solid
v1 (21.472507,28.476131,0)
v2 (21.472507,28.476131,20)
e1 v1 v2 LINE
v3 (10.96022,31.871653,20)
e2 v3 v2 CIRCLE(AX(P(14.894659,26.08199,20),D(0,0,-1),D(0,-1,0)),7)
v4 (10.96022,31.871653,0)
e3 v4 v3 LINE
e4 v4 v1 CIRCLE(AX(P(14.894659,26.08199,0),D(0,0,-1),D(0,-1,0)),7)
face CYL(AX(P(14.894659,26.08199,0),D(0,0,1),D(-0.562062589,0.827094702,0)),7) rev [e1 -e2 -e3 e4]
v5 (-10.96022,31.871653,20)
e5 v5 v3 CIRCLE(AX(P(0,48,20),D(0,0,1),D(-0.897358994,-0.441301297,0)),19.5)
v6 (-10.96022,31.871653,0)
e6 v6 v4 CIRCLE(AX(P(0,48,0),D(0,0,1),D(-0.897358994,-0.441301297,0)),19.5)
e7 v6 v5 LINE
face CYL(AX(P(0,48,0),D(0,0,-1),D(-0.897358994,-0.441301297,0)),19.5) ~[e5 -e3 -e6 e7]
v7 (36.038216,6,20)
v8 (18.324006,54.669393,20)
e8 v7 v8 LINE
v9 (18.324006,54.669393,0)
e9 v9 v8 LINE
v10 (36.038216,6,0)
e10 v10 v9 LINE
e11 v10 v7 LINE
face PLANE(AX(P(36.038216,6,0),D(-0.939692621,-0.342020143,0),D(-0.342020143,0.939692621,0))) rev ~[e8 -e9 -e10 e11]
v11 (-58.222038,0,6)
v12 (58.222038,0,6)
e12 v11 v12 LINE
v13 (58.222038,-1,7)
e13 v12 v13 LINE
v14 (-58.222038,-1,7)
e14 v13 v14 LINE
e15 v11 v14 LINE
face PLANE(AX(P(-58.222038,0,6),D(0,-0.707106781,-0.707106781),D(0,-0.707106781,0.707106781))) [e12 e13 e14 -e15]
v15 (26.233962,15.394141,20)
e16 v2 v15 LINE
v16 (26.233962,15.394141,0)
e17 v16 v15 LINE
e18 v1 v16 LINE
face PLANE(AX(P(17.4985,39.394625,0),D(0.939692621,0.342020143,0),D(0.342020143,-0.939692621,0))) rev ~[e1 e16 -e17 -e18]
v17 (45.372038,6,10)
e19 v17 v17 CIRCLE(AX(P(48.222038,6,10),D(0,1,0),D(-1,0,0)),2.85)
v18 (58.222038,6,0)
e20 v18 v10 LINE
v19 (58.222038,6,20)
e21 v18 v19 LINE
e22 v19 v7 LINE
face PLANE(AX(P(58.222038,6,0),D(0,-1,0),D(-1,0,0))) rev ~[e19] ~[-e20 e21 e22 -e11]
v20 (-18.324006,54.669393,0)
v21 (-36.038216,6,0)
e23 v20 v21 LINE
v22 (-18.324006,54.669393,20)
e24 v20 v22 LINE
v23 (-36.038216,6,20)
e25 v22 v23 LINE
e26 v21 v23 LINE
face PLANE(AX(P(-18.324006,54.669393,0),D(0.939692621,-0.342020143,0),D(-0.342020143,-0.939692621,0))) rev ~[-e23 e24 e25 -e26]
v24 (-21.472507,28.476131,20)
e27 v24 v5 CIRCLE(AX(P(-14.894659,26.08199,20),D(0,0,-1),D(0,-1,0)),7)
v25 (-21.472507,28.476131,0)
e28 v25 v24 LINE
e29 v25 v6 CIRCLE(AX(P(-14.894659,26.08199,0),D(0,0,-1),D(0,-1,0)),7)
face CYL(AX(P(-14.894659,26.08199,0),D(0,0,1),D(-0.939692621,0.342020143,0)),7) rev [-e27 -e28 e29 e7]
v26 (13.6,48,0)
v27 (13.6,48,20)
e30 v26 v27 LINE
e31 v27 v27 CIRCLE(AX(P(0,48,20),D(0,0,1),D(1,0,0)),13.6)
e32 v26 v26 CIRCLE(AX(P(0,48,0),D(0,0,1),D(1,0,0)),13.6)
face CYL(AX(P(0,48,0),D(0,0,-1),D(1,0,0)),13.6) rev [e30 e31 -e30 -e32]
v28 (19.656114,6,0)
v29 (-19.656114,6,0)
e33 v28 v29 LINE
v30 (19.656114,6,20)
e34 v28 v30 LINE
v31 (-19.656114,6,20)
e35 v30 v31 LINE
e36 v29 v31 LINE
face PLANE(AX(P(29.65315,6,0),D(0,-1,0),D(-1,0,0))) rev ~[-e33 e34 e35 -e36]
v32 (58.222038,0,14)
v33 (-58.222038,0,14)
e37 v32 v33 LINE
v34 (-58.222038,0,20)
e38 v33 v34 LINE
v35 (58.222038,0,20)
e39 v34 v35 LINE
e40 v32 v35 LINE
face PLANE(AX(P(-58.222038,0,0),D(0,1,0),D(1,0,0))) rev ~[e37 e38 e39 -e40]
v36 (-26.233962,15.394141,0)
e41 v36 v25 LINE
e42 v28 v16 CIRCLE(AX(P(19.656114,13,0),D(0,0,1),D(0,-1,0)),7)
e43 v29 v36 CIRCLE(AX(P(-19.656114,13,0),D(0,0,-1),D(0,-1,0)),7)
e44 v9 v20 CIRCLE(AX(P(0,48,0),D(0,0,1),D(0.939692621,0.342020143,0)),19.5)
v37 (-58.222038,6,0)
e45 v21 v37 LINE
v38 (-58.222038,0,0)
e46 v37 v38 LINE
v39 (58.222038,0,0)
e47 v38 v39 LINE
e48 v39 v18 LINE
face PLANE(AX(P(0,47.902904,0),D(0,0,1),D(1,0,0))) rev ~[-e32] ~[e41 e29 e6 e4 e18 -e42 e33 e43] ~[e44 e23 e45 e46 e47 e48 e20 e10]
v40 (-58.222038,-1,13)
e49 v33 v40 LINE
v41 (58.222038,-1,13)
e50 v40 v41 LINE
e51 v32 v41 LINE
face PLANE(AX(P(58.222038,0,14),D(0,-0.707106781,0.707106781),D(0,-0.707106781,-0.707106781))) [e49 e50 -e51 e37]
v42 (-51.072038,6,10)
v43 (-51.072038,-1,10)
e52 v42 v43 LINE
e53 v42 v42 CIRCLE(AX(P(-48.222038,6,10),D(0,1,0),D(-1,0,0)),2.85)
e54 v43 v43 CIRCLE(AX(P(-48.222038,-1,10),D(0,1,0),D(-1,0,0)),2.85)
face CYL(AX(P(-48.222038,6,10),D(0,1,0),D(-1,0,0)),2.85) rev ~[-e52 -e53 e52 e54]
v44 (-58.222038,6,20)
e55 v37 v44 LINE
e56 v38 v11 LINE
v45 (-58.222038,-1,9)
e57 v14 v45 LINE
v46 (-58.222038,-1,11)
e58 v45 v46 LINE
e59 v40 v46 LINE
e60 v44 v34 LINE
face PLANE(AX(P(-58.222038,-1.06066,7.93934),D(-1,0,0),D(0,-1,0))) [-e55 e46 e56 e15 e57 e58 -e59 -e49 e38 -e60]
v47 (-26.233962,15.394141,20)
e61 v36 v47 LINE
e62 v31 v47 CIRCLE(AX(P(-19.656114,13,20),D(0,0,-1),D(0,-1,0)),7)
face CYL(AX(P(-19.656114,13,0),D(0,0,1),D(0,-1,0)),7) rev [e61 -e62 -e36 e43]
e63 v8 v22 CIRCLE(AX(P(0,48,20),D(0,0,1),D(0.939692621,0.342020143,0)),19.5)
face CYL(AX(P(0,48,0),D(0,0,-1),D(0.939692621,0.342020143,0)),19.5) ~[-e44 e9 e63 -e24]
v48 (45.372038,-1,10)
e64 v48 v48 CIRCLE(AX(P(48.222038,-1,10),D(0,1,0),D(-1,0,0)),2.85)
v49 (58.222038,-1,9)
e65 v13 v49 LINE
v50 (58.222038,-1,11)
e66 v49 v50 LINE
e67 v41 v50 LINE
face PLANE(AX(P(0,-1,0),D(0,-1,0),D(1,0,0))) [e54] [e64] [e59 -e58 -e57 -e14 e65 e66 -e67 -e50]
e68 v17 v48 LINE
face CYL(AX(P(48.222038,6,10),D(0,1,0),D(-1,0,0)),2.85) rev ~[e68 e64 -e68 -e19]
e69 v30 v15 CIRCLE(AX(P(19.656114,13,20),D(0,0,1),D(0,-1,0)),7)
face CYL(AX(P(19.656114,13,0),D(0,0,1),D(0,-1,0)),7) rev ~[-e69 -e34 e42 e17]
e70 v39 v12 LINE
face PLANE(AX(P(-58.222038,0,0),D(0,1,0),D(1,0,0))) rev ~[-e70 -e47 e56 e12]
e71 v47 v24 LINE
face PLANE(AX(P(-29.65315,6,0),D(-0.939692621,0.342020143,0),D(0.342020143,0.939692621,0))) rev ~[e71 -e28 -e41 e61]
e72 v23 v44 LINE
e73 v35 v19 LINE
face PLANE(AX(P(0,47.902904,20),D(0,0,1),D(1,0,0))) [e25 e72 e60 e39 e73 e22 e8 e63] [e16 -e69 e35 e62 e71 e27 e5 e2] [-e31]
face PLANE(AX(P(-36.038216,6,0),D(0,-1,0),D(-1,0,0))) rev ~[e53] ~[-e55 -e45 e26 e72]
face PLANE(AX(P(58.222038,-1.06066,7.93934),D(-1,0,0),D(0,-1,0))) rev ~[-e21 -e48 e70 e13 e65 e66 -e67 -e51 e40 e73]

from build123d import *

# Parameters (mm, degrees)
F0_R        = 13.6
F0_W        = 59.3062995352
F0_H        = 6
F1_DEPTH    = 20
F2_R        = 7
F3_W        = 116.4440756161
F3_H        = 2
F4_DEPTH    = 1
F5_T4_DEPTH = 116.4440756161
F5_T9_DEPTH = 116.4440756161
F6_R        = 2.85
F7_DEPTH    = 25


# Not quite as in the source:
# - a fillet or chamfer that OpenCascade refuses, or shapes differently, is made with other operations: its cross-section is extruded or revolved along the edge and cut away or added


with BuildPart() as f1:
    # F0 (on Top) → F1 (new body)
    with BuildSketch(Plane.XY):
        with BuildLine():
            ThreePointArc((17.4985003919, 39.3946247011), (18.9930350082, 43.5824643545), (19.5, 48))
            ThreePointArc((19.5, 48), (19.2037511837, 51.3861394645), (18.3240061053, 54.6693927949))
            ThreePointArc((18.3240061053, 54.6693927949), (0, 67.5), (-18.3240061053, 54.6693927949))
            ThreePointArc((-18.3240061053, 54.6693927949), (-19.4715851439, 46.9476825647), (-17.4985003919, 39.3946247011))
            ThreePointArc((-17.4985003919, 39.3946247011), (0, 28.5), (17.4985003919, 39.3946247011))
        make_face()
        with Locations((0, 48)):
            Circle(F0_R, mode=Mode.SUBTRACT)
        with BuildLine():
            ThreePointArc((-17.4985003919, 39.3946247011), (-19.4715851439, 46.9476825647), (-18.3240061053, 54.6693927949))
            Line((-18.3240061053, 54.6693927949), (-36.0382164025, 6))
            Line((-36.0382164025, 6), (-29.6531497676, 6))
            Line((-29.6531497676, 6), (-17.4985003919, 39.3946247011))
        make_face()
        Polygon((-29.6531497676, 6), (-36.0382164025, 6), (-38.2220378081, 0), (-29.6531497676, 0), align=None)
        Polygon((-38.2220378081, 0), (-36.0382164025, 6), (-58.2220378081, 6), (-58.2220378081, 0), align=None)
        with Locations((0, 3)):
            Rectangle(F0_W, F0_H)
        Polygon((38.2220378081, 0), (36.0382164025, 6), (29.6531497676, 6), (29.6531497676, 0), align=None)
        Polygon((58.2220378081, 6), (36.0382164025, 6), (38.2220378081, 0), (58.2220378081, 0), align=None)
        with BuildLine():
            ThreePointArc((18.3240061053, 54.6693927949), (19.2037511837, 51.3861394645), (19.5, 48))
            ThreePointArc((19.5, 48), (18.9930350082, 43.5824643545), (17.4985003919, 39.3946247011))
            Line((17.4985003919, 39.3946247011), (29.6531497676, 6))
            Line((29.6531497676, 6), (36.0382164025, 6))
            Line((36.0382164025, 6), (18.3240061053, 54.6693927949))
        make_face()
    extrude(amount=F1_DEPTH)

    # F2
    f2_edges = [f1.edges().sort_by_distance(p)[0] for p in [
        (-17.4985, 39.394625, 10),
        (17.4985, 39.394625, 10),
        (-29.65315, 6, 10),
        (29.65315, 6, 10),
    ]]
    fillet(f2_edges, radius=F2_R)

    # F3 (on face) → F4 (join)
    with BuildSketch(Plane.XZ):
        with Locations((0, 10)):
            Rectangle(F3_W, F3_H)
    extrude(amount=F4_DEPTH)

    # F5: chamfer of 3 on 2 edges, made by hand


with BuildPart() as f5_tool2:
    # F5_s3 → F5_t4 (new body)
    with BuildSketch(Plane.YZ.offset(58.2220378081)):
        Polygon((0, 14), (-3, 11), (0, 11), align=None)
    extrude(amount=-F5_T4_DEPTH)

    split(bisect_by=Plane.XZ.offset(1), keep=Keep.BOTTOM)


with BuildPart() as f1_1:
    add(f1.part)

    # F5_t1: union F5_tool2
    add(f5_tool2.part)


with BuildPart() as f5_tool7:
    # F5_s8 → F5_t9 (new body)
    with BuildSketch(Plane.YZ.offset(-58.2220378081)):
        Polygon((0, 6), (-3, 9), (0, 9), align=None)
    extrude(amount=F5_T9_DEPTH)

    split(bisect_by=Plane.XZ.offset(1), keep=Keep.BOTTOM)


with BuildPart() as f1_2:
    add(f1_1.part)

    # F5_t6: union F5_tool7
    add(f5_tool7.part)

    # F6 (on face) → F7 (cut)
    with BuildSketch(Plane(origin=(0, 6, 0), x_dir=(-1, 0, 0), z_dir=(0, 1, 0))):
        with Locations((48.2220378081, 10)):
            Circle(F6_R)
        with Locations((-48.2220378081, 10)):
            Circle(F6_R)
    extrude(amount=-F7_DEPTH, mode=Mode.SUBTRACT)


solid = f1_2.part
